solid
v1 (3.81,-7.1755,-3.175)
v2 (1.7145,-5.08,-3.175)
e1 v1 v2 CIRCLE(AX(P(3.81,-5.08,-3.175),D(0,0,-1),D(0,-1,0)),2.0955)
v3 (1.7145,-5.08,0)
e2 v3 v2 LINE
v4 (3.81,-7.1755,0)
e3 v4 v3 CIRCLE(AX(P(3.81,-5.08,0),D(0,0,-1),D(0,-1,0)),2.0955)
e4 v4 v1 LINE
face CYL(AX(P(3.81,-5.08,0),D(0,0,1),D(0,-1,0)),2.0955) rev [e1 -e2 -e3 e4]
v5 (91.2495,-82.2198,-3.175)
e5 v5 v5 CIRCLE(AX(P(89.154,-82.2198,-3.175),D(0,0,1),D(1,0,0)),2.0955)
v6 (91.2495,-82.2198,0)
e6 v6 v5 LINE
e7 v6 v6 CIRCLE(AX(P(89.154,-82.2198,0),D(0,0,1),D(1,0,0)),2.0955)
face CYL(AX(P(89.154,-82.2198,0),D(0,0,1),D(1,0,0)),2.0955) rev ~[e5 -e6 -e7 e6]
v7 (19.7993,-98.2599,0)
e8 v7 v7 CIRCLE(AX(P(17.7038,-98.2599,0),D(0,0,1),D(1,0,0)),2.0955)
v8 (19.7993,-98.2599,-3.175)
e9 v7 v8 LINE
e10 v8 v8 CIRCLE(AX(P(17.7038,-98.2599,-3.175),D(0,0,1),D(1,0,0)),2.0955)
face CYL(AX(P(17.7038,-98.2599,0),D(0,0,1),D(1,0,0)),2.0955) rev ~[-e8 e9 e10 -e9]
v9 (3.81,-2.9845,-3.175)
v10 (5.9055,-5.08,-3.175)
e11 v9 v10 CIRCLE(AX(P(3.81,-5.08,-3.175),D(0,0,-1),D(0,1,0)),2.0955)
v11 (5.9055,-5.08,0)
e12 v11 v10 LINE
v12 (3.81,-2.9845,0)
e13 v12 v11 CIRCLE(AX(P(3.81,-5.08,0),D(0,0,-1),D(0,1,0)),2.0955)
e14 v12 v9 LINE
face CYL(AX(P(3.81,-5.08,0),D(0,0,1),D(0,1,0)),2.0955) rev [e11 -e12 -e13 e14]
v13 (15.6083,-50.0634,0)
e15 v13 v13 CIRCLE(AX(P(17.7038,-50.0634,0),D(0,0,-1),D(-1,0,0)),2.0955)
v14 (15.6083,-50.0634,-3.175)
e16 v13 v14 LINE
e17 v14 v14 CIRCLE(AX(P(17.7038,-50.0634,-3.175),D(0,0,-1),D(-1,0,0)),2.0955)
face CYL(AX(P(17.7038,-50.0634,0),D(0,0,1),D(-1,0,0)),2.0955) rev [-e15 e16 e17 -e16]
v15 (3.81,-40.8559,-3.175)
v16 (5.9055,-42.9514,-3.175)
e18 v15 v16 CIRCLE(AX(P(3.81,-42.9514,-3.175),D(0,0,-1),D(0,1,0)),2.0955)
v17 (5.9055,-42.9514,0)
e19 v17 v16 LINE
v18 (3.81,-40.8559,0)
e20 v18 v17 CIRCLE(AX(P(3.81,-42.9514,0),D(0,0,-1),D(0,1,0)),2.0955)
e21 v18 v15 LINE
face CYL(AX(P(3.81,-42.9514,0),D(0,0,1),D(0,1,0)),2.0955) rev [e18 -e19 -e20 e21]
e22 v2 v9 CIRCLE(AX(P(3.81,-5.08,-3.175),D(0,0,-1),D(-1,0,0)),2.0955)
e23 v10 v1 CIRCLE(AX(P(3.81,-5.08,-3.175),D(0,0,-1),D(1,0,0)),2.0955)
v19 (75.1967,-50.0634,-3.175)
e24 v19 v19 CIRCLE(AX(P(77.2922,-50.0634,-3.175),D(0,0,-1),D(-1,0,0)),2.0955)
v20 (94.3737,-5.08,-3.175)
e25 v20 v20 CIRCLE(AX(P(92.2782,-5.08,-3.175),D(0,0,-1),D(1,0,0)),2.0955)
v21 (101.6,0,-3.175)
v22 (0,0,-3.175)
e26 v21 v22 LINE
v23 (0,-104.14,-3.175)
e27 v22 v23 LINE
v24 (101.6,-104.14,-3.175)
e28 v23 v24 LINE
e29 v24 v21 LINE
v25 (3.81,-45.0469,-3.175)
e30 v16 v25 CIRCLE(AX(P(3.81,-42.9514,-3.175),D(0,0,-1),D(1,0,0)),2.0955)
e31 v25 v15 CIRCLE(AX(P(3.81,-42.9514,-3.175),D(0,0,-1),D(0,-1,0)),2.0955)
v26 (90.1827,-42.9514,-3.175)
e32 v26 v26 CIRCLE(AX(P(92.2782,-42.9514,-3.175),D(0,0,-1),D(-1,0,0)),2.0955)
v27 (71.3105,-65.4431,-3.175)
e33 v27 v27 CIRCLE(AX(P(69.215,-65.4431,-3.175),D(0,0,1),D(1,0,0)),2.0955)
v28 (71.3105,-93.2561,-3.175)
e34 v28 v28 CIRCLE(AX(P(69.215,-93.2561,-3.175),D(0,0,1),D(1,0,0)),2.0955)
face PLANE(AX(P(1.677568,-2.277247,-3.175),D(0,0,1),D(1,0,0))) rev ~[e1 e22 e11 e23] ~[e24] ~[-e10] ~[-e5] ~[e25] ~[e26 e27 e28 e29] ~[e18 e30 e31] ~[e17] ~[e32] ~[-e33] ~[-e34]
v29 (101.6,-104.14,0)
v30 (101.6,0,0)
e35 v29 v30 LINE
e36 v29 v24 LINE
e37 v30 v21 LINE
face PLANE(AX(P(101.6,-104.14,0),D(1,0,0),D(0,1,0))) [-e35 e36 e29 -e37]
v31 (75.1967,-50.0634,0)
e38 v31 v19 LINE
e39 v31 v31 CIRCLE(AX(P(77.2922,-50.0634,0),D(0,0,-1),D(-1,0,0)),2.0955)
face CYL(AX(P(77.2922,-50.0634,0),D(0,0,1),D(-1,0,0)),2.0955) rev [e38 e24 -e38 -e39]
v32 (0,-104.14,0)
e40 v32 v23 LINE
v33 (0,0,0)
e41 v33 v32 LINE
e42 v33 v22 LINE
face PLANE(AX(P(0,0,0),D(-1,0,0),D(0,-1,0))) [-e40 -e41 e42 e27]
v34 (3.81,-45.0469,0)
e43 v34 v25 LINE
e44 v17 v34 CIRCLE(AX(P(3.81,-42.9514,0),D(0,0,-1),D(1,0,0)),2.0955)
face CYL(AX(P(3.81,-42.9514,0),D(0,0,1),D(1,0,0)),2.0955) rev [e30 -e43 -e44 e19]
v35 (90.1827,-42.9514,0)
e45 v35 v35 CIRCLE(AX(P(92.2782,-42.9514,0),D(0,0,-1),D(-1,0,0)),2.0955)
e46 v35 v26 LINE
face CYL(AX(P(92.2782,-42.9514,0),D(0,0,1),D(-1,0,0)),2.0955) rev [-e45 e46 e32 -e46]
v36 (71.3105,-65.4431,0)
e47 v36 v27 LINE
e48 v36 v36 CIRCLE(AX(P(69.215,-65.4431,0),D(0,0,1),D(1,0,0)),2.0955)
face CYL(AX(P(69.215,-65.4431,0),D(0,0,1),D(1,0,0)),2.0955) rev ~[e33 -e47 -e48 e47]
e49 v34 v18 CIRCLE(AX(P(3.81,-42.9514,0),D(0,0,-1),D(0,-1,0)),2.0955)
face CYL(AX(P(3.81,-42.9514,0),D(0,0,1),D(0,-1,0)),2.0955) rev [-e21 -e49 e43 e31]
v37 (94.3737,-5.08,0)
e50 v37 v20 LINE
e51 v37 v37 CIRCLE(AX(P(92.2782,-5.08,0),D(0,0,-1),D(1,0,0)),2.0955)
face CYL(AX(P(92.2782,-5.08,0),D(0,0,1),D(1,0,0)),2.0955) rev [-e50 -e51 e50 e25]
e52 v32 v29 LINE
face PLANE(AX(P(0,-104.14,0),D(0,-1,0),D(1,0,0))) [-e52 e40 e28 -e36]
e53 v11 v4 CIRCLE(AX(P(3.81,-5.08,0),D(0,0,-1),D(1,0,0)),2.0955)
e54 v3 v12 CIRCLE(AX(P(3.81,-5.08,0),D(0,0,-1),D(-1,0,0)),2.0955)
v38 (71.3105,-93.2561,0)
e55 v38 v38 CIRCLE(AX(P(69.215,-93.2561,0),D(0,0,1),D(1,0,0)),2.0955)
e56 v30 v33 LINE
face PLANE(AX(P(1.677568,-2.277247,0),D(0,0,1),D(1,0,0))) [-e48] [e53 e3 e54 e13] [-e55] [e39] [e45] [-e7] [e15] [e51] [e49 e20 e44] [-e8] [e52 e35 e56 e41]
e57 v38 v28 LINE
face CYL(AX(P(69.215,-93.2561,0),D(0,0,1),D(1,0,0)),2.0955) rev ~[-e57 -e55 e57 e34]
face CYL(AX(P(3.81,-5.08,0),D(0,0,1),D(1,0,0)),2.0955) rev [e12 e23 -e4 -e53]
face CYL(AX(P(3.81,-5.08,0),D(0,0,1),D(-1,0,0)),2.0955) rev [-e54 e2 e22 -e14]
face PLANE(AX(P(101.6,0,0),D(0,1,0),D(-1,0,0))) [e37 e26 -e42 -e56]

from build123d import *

# Parameters (mm, degrees)
F0_R     = 2.0955
F1_DEPTH = 3.175


with BuildPart() as f1:
    # F0 (on Top) → F1 (new body)
    with BuildSketch(Plane.XY):
        with BuildLine():
            Line((3.81, 0), (0, 0))
            Line((0, 0), (0, -5.08))
            Line((0, -5.08), (1.7145, -5.08))
            ThreePointArc((1.7145, -5.08), (2.32825774, -3.59825774), (3.81, -2.9845))
            Line((3.81, -2.9845), (3.81, 0))
        make_face()
        with BuildLine():
            Line((101.6, 0), (3.81, 0))
            Line((3.81, 0), (3.81, -2.9845))
            ThreePointArc((3.81, -2.9845), (5.29174226, -3.59825774), (5.9055, -5.08))
            Line((5.9055, -5.08), (90.1827, -5.08))
            ThreePointArc((90.1827, -5.08), (92.2782, -2.9845), (94.3737, -5.08))
            Line((94.3737, -5.08), (101.6, -5.08))
            Line((101.6, -5.08), (101.6, 0))
        make_face()
        with BuildLine():
            Line((1.7145, -5.08), (0, -5.08))
            Line((0, -5.08), (0, -104.14))
            Line((0, -104.14), (3.81, -104.14))
            Line((3.81, -104.14), (3.81, -50.0634))
            Line((3.81, -50.0634), (3.81, -45.0469))
            ThreePointArc((3.81, -45.0469), (1.7145, -42.9514), (3.81, -40.8559))
            Line((3.81, -40.8559), (3.81, -7.1755))
            ThreePointArc((3.81, -7.1755), (2.32825774, -6.56174226), (1.7145, -5.08))
        make_face()
        with BuildLine():
            Line((101.6, -104.14), (101.6, -5.08))
            Line((101.6, -5.08), (94.3737, -5.08))
            ThreePointArc((94.3737, -5.08), (92.2782, -7.1755), (90.1827, -5.08))
            Line((90.1827, -5.08), (5.9055, -5.08))
            ThreePointArc((5.9055, -5.08), (5.29174226, -6.56174226), (3.81, -7.1755))
            Line((3.81, -7.1755), (3.81, -40.8559))
            ThreePointArc((3.81, -40.8559), (5.29174226, -41.46965774), (5.9055, -42.9514))
            ThreePointArc((5.9055, -42.9514), (5.29174226, -44.43314226), (3.81, -45.0469))
            Line((3.81, -45.0469), (3.81, -50.0634))
            Line((3.81, -50.0634), (3.81, -104.14))
            Line((3.81, -104.14), (101.6, -104.14))
        make_face()
        with Locations((17.7038, -98.2599)):
            Circle(F0_R, mode=Mode.SUBTRACT)
        with Locations((69.215, -93.2561)):
            Circle(F0_R, mode=Mode.SUBTRACT)
        with Locations((89.154, -82.2198)):
            Circle(F0_R, mode=Mode.SUBTRACT)
        with Locations((69.215, -65.4431)):
            Circle(F0_R, mode=Mode.SUBTRACT)
        with BuildLine():
            ThreePointArc((19.7993, -50.0634), (17.7038, -52.1589), (15.6083, -50.0634))
            ThreePointArc((15.6083, -50.0634), (17.7038, -47.9679), (19.7993, -50.0634))
        make_face(mode=Mode.SUBTRACT)
        with BuildLine():
            ThreePointArc((79.3877, -50.0634), (77.2922, -52.1589), (75.1967, -50.0634))
            ThreePointArc((75.1967, -50.0634), (77.2922, -47.9679), (79.3877, -50.0634))
        make_face(mode=Mode.SUBTRACT)
        with BuildLine():
            ThreePointArc((94.3737, -42.9514), (92.2782, -45.0469), (90.1827, -42.9514))
            ThreePointArc((90.1827, -42.9514), (92.2782, -40.8559), (94.3737, -42.9514))
        make_face(mode=Mode.SUBTRACT)
    extrude(amount=-F1_DEPTH)


solid = f1.part
